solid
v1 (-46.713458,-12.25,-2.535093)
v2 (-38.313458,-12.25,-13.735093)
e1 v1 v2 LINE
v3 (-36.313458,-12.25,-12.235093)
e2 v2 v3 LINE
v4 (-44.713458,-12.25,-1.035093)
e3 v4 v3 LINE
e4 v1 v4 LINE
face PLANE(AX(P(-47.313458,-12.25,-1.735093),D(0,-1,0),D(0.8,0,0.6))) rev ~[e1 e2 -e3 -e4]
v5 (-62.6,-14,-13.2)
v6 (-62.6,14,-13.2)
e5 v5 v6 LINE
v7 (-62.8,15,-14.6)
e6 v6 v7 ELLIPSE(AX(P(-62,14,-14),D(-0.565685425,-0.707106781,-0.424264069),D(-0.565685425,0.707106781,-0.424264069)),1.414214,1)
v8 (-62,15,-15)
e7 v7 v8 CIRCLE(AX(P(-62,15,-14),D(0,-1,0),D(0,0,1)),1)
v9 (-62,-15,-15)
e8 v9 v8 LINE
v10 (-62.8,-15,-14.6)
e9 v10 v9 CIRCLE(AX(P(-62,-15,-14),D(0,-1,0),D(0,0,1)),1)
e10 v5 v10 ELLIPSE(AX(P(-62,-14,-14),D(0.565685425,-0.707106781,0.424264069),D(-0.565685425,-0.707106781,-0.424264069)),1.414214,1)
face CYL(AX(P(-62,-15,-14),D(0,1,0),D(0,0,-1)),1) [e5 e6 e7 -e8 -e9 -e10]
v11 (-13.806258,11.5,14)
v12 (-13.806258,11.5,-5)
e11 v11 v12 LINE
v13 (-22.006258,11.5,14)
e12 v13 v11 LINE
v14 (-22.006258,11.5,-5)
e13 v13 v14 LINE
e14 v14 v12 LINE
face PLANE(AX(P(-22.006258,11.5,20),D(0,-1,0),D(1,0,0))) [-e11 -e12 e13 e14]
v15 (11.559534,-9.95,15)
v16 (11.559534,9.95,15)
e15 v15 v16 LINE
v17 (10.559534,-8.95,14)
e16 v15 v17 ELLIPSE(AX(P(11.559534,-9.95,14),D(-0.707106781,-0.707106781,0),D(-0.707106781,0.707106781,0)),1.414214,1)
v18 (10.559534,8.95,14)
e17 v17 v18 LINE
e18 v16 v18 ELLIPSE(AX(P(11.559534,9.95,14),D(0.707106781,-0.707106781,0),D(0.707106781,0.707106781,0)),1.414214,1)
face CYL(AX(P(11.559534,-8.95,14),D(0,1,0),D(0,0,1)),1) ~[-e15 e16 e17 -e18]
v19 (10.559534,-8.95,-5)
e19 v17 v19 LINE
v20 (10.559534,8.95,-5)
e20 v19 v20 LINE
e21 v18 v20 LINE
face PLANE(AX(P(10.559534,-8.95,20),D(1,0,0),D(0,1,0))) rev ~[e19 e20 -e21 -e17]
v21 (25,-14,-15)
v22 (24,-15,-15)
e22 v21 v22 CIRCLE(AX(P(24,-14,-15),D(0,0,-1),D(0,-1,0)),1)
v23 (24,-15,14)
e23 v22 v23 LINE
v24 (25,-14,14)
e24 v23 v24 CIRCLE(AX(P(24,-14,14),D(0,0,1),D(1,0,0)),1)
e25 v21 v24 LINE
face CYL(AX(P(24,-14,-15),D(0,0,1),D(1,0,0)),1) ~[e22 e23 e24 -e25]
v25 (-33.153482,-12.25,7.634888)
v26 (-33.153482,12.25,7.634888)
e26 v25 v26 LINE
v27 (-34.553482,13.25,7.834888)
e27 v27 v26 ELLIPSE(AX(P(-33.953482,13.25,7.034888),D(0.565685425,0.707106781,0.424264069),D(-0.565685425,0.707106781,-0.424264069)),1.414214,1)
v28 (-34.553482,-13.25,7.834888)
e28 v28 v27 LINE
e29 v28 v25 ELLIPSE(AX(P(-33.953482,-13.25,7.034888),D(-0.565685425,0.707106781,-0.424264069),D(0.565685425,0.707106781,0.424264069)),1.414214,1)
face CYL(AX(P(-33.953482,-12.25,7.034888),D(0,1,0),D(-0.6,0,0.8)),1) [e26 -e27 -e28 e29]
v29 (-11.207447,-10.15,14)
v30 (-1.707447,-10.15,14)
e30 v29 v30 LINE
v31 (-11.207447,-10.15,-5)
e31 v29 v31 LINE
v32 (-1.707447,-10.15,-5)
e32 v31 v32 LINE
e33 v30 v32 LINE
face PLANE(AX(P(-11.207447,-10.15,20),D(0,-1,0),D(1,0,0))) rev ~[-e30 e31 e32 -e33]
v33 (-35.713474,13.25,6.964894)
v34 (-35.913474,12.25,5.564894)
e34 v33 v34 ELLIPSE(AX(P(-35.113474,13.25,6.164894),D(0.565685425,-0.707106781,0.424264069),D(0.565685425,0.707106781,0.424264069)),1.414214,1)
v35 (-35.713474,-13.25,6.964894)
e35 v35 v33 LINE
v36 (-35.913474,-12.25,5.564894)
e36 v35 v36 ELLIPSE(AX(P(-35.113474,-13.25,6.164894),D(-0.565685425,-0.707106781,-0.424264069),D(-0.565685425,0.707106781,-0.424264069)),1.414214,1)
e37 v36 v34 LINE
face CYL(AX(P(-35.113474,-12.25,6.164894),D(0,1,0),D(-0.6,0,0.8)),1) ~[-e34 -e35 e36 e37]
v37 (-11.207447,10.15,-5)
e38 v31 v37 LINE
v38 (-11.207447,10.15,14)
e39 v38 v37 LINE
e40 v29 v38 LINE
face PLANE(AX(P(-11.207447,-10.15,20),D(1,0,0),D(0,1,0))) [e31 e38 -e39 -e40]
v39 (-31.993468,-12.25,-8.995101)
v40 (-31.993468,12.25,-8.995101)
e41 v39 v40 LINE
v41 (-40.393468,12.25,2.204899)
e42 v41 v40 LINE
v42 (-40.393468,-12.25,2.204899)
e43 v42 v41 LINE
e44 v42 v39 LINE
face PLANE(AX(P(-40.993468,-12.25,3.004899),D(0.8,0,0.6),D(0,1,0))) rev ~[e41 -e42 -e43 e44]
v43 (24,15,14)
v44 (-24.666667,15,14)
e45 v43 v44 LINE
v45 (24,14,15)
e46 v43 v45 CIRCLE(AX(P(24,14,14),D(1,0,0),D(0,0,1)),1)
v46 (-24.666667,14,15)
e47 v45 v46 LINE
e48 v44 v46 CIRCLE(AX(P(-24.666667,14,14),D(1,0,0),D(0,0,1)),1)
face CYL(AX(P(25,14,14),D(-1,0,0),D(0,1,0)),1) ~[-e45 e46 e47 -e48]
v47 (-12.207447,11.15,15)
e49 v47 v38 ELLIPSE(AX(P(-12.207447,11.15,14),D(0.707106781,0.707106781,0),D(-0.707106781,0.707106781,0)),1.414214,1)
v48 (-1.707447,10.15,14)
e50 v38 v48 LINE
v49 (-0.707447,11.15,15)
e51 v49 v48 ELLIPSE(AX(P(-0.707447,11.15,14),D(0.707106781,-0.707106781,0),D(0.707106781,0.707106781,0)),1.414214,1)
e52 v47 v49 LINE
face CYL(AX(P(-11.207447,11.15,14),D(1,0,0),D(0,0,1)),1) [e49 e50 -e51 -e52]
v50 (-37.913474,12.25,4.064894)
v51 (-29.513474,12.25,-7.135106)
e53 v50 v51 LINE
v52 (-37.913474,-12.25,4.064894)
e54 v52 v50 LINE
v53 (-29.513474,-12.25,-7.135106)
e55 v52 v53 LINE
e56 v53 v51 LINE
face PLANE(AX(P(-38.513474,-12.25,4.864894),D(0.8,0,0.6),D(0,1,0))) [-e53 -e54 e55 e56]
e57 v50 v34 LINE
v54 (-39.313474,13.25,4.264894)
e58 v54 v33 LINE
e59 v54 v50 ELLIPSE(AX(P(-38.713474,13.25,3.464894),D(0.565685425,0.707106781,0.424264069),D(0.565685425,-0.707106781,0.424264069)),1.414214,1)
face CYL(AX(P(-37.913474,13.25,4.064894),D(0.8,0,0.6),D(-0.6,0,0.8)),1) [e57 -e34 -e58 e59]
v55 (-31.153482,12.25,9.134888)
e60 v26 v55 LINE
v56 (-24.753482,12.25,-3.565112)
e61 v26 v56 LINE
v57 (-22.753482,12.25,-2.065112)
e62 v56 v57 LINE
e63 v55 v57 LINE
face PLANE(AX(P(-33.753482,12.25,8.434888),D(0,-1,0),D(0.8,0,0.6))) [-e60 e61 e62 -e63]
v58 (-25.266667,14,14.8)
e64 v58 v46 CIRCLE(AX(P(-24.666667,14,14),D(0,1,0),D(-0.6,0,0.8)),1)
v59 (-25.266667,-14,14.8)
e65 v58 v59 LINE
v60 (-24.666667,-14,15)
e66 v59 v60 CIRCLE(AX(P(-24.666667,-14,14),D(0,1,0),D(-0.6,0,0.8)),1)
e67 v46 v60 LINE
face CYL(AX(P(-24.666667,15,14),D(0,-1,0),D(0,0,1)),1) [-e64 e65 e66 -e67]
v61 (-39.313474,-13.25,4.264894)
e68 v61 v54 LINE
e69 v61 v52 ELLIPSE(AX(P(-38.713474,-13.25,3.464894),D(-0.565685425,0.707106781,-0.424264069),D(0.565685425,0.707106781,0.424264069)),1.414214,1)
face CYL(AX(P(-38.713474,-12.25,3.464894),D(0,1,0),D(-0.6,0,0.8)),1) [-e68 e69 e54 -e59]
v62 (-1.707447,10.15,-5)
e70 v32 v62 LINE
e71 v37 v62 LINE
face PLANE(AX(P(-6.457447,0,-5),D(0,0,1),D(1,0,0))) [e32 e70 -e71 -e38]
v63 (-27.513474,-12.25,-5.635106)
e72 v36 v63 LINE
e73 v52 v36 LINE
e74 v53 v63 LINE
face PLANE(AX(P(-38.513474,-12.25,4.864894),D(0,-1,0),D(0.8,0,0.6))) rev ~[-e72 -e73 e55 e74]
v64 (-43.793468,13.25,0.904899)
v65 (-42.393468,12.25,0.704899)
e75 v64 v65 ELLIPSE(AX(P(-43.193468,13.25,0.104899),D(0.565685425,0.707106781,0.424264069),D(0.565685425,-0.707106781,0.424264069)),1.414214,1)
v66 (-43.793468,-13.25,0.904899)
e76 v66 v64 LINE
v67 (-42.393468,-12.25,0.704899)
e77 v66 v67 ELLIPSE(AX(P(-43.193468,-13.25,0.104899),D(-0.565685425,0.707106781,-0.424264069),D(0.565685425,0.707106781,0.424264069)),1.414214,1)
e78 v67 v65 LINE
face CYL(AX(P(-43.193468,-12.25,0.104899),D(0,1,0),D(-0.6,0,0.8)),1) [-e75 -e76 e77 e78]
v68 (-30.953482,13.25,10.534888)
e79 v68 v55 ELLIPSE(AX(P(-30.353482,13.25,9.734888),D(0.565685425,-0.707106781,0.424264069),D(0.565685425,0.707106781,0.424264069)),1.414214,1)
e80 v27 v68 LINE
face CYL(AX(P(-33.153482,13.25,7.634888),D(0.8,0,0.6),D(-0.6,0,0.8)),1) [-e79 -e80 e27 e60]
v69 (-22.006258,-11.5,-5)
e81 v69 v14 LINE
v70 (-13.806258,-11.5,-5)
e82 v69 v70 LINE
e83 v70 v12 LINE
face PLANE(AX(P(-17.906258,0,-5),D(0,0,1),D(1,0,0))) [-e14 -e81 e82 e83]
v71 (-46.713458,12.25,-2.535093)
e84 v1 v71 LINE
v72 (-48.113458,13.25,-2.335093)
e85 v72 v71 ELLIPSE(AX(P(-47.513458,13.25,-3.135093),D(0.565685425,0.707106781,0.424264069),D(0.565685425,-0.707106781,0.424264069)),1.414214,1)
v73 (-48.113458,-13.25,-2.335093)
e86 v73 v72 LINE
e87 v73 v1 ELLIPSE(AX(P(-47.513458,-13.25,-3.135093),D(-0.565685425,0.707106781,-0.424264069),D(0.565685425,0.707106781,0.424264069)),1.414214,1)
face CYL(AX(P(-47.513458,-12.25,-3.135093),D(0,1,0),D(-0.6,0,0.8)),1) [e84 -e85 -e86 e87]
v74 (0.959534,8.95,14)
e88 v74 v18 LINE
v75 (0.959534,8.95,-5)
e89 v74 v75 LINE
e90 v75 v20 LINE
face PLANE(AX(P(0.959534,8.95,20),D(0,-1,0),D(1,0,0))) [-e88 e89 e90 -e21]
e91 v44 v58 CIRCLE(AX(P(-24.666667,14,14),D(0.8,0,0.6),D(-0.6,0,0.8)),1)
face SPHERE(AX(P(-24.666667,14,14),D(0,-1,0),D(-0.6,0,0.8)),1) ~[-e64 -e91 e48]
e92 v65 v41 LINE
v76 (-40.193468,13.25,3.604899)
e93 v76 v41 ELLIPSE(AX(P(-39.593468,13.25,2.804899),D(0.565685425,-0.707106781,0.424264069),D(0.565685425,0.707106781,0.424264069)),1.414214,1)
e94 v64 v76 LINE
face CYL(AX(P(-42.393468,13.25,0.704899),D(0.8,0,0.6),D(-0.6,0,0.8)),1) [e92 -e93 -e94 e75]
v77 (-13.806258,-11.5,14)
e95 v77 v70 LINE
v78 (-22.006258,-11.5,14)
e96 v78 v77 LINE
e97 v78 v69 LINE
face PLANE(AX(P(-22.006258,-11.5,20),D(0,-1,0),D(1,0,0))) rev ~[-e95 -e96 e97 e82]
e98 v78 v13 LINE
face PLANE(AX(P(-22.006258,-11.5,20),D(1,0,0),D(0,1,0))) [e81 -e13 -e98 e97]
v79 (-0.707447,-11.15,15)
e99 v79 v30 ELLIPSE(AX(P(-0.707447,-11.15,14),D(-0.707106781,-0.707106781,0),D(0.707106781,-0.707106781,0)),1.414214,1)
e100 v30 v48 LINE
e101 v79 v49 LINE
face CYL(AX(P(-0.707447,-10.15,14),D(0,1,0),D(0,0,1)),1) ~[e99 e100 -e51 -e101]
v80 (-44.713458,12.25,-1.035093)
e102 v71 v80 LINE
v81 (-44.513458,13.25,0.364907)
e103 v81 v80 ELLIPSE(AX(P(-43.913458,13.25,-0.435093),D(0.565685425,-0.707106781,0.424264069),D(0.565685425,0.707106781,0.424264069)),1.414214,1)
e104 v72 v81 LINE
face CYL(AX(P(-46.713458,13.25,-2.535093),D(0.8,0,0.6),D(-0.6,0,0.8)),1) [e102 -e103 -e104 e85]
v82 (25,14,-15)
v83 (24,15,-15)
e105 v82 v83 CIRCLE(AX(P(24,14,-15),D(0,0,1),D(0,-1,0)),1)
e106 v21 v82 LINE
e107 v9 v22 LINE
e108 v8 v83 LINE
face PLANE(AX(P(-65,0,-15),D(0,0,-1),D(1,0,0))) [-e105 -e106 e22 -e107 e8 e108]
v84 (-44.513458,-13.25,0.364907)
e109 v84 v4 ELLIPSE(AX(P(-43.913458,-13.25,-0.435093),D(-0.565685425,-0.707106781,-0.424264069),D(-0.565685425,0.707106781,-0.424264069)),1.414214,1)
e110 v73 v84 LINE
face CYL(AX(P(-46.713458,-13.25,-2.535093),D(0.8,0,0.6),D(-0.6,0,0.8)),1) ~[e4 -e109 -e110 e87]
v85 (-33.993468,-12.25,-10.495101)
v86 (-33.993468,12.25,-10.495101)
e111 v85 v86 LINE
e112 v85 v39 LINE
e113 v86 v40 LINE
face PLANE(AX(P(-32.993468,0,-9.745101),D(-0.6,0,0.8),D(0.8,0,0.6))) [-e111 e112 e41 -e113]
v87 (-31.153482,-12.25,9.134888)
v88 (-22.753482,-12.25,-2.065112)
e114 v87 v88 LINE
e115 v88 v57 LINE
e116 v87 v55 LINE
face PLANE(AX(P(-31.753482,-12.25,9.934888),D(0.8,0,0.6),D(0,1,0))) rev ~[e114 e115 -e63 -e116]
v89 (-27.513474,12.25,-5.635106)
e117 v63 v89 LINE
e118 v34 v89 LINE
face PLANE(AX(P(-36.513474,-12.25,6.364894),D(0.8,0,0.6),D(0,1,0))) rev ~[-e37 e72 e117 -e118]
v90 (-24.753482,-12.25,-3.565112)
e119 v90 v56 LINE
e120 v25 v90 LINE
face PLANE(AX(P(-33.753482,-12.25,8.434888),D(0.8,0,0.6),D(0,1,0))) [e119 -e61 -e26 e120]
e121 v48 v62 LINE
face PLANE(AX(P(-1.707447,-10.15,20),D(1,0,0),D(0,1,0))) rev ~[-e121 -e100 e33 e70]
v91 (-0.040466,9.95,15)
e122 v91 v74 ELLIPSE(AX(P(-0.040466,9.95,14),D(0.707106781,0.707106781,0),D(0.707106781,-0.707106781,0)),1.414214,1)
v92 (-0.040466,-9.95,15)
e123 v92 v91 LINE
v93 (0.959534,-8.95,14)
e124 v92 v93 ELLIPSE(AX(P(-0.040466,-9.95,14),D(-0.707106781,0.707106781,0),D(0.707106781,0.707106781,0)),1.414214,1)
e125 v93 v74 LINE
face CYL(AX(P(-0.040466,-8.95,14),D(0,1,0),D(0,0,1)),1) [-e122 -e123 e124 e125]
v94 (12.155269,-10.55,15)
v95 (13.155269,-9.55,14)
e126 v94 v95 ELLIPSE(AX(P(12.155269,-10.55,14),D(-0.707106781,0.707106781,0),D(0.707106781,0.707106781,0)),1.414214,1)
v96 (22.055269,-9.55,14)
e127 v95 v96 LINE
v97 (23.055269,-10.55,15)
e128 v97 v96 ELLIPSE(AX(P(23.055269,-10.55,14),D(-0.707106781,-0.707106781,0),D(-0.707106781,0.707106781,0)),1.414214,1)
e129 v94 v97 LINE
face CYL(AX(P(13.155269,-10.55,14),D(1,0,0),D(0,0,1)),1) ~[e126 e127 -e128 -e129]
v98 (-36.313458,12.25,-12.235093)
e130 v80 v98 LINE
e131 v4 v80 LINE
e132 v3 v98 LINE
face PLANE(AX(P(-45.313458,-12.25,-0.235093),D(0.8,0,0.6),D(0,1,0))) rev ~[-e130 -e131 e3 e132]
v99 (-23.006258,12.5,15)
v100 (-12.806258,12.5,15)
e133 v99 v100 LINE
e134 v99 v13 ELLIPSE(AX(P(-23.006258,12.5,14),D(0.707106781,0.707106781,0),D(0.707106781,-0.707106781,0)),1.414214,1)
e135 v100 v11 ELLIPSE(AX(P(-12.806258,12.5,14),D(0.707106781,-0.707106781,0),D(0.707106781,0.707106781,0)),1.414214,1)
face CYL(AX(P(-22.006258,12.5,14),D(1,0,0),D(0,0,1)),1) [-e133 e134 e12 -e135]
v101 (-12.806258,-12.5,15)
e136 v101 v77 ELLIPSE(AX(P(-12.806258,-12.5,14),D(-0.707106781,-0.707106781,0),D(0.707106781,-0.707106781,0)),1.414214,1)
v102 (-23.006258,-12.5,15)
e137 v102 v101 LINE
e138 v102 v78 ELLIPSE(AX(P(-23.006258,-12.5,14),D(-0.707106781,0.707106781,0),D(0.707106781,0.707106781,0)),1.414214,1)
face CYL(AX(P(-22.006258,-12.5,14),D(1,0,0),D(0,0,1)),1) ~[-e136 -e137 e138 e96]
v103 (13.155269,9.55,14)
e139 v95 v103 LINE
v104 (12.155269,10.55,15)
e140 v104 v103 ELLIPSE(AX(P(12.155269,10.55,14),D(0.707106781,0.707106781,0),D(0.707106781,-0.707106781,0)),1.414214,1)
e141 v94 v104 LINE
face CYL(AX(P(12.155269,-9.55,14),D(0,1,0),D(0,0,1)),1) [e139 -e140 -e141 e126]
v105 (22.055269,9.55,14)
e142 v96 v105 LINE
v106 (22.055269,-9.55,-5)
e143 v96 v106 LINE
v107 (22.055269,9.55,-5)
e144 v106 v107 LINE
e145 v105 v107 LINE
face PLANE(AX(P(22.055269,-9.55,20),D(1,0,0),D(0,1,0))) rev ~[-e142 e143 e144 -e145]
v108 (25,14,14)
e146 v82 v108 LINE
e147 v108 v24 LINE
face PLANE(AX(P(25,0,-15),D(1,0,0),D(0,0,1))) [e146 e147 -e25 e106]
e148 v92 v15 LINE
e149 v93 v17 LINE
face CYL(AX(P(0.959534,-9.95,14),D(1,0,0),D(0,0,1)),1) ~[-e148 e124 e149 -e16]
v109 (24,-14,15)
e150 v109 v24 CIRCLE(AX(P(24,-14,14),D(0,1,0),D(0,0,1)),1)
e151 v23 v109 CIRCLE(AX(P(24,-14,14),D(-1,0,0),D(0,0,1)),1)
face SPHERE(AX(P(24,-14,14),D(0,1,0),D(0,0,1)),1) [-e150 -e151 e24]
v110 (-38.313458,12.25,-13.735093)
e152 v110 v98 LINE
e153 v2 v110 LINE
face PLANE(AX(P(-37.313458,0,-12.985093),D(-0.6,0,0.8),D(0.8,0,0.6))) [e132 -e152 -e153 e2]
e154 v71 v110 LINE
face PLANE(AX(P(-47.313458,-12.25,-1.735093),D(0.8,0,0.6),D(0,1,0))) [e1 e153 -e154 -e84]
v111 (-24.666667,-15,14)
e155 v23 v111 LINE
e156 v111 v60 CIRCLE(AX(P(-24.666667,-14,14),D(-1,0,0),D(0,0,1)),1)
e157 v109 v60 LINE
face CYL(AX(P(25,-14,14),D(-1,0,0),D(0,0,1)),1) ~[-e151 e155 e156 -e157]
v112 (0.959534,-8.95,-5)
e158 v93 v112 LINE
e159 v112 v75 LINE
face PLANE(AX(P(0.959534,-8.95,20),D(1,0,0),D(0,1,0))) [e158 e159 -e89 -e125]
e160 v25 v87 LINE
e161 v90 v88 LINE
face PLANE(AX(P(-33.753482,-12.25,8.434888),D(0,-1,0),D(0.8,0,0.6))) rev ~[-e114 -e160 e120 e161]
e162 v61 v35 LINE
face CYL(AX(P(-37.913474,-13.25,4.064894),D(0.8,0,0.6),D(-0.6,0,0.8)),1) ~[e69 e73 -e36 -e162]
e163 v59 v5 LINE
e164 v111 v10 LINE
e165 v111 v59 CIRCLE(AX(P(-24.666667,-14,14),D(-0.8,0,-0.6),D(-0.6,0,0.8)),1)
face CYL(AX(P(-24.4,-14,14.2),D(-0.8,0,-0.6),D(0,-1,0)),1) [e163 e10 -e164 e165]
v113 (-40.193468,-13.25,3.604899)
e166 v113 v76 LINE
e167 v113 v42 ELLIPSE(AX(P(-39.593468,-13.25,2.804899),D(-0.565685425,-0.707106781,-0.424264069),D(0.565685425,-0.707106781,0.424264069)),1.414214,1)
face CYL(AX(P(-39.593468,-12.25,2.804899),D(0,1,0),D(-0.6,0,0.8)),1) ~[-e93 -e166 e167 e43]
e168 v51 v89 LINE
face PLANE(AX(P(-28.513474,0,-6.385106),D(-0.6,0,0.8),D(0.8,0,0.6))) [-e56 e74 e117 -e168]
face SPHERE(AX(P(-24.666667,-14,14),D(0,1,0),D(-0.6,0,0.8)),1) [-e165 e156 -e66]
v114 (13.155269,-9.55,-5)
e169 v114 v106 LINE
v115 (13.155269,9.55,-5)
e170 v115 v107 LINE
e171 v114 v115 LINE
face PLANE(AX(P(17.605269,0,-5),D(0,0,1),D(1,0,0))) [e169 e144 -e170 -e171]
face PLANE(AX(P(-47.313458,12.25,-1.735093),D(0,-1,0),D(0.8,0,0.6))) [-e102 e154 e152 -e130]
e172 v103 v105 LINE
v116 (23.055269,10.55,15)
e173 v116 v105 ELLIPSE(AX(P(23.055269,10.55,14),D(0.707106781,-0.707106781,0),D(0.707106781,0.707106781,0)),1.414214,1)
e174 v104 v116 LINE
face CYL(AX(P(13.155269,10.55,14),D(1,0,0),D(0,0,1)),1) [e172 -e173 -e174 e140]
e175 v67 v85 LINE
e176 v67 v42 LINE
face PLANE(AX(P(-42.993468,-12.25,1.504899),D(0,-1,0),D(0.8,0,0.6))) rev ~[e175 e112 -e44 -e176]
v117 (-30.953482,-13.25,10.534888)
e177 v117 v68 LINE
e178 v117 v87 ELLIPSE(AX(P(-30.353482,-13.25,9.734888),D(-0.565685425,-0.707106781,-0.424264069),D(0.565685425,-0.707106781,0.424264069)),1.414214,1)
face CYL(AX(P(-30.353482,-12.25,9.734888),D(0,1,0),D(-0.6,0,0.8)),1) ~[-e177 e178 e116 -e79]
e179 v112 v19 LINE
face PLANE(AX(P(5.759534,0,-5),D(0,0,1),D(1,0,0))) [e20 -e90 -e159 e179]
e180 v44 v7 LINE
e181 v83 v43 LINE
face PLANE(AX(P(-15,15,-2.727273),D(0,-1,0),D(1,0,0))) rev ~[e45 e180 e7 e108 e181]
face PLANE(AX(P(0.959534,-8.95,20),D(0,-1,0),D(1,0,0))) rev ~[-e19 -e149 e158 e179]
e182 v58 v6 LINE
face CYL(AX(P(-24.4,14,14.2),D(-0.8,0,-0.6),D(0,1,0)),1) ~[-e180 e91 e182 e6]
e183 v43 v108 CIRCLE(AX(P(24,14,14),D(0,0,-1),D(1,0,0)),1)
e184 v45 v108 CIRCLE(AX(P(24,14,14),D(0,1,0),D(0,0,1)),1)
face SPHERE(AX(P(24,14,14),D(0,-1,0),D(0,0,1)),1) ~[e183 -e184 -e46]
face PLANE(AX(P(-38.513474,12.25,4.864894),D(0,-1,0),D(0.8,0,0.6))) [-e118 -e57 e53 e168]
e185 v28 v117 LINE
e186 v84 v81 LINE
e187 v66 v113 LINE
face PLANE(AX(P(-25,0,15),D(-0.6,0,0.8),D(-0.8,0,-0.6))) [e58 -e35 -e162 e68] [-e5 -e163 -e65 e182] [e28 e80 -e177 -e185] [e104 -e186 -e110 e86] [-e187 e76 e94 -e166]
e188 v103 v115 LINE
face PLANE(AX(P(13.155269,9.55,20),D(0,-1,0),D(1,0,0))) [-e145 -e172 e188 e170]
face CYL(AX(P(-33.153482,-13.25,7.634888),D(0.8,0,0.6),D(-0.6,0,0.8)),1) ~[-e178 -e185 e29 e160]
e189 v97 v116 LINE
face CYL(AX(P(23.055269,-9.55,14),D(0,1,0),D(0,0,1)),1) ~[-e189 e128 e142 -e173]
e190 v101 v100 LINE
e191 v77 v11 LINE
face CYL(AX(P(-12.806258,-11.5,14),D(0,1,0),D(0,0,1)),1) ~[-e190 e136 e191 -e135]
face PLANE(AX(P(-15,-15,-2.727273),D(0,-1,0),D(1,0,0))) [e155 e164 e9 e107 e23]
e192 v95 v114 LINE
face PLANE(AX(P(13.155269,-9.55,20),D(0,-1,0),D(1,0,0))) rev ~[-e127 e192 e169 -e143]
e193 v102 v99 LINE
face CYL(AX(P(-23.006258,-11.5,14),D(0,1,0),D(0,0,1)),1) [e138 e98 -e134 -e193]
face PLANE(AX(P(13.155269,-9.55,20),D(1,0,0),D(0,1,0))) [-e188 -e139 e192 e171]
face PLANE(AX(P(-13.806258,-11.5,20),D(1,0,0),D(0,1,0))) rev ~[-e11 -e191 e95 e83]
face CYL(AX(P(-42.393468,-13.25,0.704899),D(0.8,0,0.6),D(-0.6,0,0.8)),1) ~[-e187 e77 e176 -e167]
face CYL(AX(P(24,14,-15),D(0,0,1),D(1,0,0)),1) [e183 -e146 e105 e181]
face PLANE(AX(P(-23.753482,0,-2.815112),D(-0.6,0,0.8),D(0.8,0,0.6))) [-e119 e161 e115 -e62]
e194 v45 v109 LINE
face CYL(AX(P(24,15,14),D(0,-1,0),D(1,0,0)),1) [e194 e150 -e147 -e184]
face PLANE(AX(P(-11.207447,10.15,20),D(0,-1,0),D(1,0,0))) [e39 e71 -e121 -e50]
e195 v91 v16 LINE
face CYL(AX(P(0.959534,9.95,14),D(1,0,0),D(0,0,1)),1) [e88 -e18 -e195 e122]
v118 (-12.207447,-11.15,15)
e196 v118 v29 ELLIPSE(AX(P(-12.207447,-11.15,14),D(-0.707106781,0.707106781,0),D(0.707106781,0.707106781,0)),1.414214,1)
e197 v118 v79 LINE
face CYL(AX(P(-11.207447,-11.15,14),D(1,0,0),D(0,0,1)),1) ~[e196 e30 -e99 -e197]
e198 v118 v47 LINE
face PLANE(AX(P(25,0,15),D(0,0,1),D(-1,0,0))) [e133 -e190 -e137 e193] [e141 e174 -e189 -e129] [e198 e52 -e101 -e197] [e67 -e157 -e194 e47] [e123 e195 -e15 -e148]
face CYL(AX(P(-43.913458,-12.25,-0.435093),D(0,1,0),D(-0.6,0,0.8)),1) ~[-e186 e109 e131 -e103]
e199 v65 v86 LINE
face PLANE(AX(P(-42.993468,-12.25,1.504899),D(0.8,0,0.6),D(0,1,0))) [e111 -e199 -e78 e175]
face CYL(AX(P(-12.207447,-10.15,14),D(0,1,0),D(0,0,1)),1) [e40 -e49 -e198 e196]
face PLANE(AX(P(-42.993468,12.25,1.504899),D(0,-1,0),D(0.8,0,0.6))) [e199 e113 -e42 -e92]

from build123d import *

# Parameters (mm, degrees)
F1_DEPTH = 15
F3_W     = 8.2
F3_H     = 23
F3_W_2   = 9.5
F3_H_2   = 20.3
F3_W_3   = 9.6
F3_H_3   = 17.9
F3_W_4   = 8.9
F3_H_4   = 19.1
F4_DEPTH = 25
F5_W     = 2.5
F5_H     = 24.5
F6_DEPTH = 15
F7_DEPTH = 15
F8_R     = 1


# Not quite as in the source:
# - a feature names something its author has since deleted; it is built from what else it names


with BuildPart() as f1:
    # F0 (on Front) → F1 (new body, symmetric)
    with BuildSketch(Plane.XZ):
        Polygon((25, -15), (25, 15), (-25, 15), (-65, -15), (-25, -15), align=None)
    extrude(amount=F1_DEPTH, both=True)

    # F3 (on offset) → F4 (cut)
    with BuildSketch(Plane.XY.offset(20)):
        with Locations((-17.9062577261, 0)):
            Rectangle(F3_W, F3_H)
        with Locations((-6.4574469417, 0)):
            Rectangle(F3_W_2, F3_H_2)
        with Locations((5.7595338684, 0)):
            Rectangle(F3_W_3, F3_H_3)
        with Locations((17.6052688631, 0)):
            Rectangle(F3_W_4, F3_H_4)
    extrude(amount=-F4_DEPTH, mode=Mode.SUBTRACT)

    # F5 (on face) → F6 (cut)
    with BuildSketch(Plane(origin=(-16.2, 0, 21.6), x_dir=(0.8, 0, 0.6), z_dir=(-0.6, 0, 0.8))):
        with Locations((-20.6918526966, 0)):
            Rectangle(F5_W, F5_H)
    extrude(amount=-F6_DEPTH, mode=Mode.SUBTRACT)

    # F5 (on face) → F7 (cut)
    with BuildSketch(Plane(origin=(-16.2, 0, 21.6), x_dir=(0.8, 0, 0.6), z_dir=(-0.6, 0, 0.8))):
        with Locations((-26.6418426484, -3.204e-07)):
            Rectangle(F5_W, F5_H)
        with Locations((-32.2418349981, 3.204e-07)):
            Rectangle(F5_W, F5_H)
        with Locations((-37.6418220997, 0)):
            Rectangle(F5_W, F5_H)
    extrude(amount=-F7_DEPTH, mode=Mode.SUBTRACT)

    # F8
    f8_edges = [f1.edges().sort_by_distance(p)[0] for p in [
        (-25, 0, 15),
        (-45, 15, 0),
        (-45, -15, 0),
        (-65, 0, -15),
        (-33.753482, 0, 8.434888),
        (-32.753482, 12.25, 9.184888),
        (-32.753482, -12.25, 9.184888),
        (-31.753482, 0, 9.934888),
        (-41.993468, -12.25, 2.254899),
        (-40.993468, 0, 3.004899),
        (-41.993468, 12.25, 2.254899),
        (-42.993468, 0, 1.504899),
        (-45.313458, 0, -0.235093),
        (-46.313458, 12.25, -0.985093),
        (-47.313458, 0, -1.735093),
        (-46.313458, -12.25, -0.985093),
        (-36.513474, 0, 6.364894),
        (-37.513474, 12.25, 5.614894),
        (-38.513474, 0, 4.864894),
        (-37.513474, -12.25, 5.614894),
        (25, 0, 15),
        (0, 15, 15),
        (0, -15, 15),
        (22.055269, 0, 15),
        (17.605269, 9.55, 15),
        (13.155269, 0, 15),
        (17.605269, -9.55, 15),
        (10.559534, 0, 15),
        (5.759534, 8.95, 15),
        (0.959534, 0, 15),
        (5.759534, -8.95, 15),
        (-11.207447, 0, 15),
        (-6.457447, -10.15, 15),
        (-1.707447, 0, 15),
        (-6.457447, 10.15, 15),
        (-17.906258, -11.5, 15),
        (-13.806258, 0, 15),
        (-17.906258, 11.5, 15),
        (-22.006258, 0, 15),
        (25, -15, 0),
        (25, 15, 0),
    ]]
    fillet(f8_edges, radius=F8_R)


solid = f1.part
